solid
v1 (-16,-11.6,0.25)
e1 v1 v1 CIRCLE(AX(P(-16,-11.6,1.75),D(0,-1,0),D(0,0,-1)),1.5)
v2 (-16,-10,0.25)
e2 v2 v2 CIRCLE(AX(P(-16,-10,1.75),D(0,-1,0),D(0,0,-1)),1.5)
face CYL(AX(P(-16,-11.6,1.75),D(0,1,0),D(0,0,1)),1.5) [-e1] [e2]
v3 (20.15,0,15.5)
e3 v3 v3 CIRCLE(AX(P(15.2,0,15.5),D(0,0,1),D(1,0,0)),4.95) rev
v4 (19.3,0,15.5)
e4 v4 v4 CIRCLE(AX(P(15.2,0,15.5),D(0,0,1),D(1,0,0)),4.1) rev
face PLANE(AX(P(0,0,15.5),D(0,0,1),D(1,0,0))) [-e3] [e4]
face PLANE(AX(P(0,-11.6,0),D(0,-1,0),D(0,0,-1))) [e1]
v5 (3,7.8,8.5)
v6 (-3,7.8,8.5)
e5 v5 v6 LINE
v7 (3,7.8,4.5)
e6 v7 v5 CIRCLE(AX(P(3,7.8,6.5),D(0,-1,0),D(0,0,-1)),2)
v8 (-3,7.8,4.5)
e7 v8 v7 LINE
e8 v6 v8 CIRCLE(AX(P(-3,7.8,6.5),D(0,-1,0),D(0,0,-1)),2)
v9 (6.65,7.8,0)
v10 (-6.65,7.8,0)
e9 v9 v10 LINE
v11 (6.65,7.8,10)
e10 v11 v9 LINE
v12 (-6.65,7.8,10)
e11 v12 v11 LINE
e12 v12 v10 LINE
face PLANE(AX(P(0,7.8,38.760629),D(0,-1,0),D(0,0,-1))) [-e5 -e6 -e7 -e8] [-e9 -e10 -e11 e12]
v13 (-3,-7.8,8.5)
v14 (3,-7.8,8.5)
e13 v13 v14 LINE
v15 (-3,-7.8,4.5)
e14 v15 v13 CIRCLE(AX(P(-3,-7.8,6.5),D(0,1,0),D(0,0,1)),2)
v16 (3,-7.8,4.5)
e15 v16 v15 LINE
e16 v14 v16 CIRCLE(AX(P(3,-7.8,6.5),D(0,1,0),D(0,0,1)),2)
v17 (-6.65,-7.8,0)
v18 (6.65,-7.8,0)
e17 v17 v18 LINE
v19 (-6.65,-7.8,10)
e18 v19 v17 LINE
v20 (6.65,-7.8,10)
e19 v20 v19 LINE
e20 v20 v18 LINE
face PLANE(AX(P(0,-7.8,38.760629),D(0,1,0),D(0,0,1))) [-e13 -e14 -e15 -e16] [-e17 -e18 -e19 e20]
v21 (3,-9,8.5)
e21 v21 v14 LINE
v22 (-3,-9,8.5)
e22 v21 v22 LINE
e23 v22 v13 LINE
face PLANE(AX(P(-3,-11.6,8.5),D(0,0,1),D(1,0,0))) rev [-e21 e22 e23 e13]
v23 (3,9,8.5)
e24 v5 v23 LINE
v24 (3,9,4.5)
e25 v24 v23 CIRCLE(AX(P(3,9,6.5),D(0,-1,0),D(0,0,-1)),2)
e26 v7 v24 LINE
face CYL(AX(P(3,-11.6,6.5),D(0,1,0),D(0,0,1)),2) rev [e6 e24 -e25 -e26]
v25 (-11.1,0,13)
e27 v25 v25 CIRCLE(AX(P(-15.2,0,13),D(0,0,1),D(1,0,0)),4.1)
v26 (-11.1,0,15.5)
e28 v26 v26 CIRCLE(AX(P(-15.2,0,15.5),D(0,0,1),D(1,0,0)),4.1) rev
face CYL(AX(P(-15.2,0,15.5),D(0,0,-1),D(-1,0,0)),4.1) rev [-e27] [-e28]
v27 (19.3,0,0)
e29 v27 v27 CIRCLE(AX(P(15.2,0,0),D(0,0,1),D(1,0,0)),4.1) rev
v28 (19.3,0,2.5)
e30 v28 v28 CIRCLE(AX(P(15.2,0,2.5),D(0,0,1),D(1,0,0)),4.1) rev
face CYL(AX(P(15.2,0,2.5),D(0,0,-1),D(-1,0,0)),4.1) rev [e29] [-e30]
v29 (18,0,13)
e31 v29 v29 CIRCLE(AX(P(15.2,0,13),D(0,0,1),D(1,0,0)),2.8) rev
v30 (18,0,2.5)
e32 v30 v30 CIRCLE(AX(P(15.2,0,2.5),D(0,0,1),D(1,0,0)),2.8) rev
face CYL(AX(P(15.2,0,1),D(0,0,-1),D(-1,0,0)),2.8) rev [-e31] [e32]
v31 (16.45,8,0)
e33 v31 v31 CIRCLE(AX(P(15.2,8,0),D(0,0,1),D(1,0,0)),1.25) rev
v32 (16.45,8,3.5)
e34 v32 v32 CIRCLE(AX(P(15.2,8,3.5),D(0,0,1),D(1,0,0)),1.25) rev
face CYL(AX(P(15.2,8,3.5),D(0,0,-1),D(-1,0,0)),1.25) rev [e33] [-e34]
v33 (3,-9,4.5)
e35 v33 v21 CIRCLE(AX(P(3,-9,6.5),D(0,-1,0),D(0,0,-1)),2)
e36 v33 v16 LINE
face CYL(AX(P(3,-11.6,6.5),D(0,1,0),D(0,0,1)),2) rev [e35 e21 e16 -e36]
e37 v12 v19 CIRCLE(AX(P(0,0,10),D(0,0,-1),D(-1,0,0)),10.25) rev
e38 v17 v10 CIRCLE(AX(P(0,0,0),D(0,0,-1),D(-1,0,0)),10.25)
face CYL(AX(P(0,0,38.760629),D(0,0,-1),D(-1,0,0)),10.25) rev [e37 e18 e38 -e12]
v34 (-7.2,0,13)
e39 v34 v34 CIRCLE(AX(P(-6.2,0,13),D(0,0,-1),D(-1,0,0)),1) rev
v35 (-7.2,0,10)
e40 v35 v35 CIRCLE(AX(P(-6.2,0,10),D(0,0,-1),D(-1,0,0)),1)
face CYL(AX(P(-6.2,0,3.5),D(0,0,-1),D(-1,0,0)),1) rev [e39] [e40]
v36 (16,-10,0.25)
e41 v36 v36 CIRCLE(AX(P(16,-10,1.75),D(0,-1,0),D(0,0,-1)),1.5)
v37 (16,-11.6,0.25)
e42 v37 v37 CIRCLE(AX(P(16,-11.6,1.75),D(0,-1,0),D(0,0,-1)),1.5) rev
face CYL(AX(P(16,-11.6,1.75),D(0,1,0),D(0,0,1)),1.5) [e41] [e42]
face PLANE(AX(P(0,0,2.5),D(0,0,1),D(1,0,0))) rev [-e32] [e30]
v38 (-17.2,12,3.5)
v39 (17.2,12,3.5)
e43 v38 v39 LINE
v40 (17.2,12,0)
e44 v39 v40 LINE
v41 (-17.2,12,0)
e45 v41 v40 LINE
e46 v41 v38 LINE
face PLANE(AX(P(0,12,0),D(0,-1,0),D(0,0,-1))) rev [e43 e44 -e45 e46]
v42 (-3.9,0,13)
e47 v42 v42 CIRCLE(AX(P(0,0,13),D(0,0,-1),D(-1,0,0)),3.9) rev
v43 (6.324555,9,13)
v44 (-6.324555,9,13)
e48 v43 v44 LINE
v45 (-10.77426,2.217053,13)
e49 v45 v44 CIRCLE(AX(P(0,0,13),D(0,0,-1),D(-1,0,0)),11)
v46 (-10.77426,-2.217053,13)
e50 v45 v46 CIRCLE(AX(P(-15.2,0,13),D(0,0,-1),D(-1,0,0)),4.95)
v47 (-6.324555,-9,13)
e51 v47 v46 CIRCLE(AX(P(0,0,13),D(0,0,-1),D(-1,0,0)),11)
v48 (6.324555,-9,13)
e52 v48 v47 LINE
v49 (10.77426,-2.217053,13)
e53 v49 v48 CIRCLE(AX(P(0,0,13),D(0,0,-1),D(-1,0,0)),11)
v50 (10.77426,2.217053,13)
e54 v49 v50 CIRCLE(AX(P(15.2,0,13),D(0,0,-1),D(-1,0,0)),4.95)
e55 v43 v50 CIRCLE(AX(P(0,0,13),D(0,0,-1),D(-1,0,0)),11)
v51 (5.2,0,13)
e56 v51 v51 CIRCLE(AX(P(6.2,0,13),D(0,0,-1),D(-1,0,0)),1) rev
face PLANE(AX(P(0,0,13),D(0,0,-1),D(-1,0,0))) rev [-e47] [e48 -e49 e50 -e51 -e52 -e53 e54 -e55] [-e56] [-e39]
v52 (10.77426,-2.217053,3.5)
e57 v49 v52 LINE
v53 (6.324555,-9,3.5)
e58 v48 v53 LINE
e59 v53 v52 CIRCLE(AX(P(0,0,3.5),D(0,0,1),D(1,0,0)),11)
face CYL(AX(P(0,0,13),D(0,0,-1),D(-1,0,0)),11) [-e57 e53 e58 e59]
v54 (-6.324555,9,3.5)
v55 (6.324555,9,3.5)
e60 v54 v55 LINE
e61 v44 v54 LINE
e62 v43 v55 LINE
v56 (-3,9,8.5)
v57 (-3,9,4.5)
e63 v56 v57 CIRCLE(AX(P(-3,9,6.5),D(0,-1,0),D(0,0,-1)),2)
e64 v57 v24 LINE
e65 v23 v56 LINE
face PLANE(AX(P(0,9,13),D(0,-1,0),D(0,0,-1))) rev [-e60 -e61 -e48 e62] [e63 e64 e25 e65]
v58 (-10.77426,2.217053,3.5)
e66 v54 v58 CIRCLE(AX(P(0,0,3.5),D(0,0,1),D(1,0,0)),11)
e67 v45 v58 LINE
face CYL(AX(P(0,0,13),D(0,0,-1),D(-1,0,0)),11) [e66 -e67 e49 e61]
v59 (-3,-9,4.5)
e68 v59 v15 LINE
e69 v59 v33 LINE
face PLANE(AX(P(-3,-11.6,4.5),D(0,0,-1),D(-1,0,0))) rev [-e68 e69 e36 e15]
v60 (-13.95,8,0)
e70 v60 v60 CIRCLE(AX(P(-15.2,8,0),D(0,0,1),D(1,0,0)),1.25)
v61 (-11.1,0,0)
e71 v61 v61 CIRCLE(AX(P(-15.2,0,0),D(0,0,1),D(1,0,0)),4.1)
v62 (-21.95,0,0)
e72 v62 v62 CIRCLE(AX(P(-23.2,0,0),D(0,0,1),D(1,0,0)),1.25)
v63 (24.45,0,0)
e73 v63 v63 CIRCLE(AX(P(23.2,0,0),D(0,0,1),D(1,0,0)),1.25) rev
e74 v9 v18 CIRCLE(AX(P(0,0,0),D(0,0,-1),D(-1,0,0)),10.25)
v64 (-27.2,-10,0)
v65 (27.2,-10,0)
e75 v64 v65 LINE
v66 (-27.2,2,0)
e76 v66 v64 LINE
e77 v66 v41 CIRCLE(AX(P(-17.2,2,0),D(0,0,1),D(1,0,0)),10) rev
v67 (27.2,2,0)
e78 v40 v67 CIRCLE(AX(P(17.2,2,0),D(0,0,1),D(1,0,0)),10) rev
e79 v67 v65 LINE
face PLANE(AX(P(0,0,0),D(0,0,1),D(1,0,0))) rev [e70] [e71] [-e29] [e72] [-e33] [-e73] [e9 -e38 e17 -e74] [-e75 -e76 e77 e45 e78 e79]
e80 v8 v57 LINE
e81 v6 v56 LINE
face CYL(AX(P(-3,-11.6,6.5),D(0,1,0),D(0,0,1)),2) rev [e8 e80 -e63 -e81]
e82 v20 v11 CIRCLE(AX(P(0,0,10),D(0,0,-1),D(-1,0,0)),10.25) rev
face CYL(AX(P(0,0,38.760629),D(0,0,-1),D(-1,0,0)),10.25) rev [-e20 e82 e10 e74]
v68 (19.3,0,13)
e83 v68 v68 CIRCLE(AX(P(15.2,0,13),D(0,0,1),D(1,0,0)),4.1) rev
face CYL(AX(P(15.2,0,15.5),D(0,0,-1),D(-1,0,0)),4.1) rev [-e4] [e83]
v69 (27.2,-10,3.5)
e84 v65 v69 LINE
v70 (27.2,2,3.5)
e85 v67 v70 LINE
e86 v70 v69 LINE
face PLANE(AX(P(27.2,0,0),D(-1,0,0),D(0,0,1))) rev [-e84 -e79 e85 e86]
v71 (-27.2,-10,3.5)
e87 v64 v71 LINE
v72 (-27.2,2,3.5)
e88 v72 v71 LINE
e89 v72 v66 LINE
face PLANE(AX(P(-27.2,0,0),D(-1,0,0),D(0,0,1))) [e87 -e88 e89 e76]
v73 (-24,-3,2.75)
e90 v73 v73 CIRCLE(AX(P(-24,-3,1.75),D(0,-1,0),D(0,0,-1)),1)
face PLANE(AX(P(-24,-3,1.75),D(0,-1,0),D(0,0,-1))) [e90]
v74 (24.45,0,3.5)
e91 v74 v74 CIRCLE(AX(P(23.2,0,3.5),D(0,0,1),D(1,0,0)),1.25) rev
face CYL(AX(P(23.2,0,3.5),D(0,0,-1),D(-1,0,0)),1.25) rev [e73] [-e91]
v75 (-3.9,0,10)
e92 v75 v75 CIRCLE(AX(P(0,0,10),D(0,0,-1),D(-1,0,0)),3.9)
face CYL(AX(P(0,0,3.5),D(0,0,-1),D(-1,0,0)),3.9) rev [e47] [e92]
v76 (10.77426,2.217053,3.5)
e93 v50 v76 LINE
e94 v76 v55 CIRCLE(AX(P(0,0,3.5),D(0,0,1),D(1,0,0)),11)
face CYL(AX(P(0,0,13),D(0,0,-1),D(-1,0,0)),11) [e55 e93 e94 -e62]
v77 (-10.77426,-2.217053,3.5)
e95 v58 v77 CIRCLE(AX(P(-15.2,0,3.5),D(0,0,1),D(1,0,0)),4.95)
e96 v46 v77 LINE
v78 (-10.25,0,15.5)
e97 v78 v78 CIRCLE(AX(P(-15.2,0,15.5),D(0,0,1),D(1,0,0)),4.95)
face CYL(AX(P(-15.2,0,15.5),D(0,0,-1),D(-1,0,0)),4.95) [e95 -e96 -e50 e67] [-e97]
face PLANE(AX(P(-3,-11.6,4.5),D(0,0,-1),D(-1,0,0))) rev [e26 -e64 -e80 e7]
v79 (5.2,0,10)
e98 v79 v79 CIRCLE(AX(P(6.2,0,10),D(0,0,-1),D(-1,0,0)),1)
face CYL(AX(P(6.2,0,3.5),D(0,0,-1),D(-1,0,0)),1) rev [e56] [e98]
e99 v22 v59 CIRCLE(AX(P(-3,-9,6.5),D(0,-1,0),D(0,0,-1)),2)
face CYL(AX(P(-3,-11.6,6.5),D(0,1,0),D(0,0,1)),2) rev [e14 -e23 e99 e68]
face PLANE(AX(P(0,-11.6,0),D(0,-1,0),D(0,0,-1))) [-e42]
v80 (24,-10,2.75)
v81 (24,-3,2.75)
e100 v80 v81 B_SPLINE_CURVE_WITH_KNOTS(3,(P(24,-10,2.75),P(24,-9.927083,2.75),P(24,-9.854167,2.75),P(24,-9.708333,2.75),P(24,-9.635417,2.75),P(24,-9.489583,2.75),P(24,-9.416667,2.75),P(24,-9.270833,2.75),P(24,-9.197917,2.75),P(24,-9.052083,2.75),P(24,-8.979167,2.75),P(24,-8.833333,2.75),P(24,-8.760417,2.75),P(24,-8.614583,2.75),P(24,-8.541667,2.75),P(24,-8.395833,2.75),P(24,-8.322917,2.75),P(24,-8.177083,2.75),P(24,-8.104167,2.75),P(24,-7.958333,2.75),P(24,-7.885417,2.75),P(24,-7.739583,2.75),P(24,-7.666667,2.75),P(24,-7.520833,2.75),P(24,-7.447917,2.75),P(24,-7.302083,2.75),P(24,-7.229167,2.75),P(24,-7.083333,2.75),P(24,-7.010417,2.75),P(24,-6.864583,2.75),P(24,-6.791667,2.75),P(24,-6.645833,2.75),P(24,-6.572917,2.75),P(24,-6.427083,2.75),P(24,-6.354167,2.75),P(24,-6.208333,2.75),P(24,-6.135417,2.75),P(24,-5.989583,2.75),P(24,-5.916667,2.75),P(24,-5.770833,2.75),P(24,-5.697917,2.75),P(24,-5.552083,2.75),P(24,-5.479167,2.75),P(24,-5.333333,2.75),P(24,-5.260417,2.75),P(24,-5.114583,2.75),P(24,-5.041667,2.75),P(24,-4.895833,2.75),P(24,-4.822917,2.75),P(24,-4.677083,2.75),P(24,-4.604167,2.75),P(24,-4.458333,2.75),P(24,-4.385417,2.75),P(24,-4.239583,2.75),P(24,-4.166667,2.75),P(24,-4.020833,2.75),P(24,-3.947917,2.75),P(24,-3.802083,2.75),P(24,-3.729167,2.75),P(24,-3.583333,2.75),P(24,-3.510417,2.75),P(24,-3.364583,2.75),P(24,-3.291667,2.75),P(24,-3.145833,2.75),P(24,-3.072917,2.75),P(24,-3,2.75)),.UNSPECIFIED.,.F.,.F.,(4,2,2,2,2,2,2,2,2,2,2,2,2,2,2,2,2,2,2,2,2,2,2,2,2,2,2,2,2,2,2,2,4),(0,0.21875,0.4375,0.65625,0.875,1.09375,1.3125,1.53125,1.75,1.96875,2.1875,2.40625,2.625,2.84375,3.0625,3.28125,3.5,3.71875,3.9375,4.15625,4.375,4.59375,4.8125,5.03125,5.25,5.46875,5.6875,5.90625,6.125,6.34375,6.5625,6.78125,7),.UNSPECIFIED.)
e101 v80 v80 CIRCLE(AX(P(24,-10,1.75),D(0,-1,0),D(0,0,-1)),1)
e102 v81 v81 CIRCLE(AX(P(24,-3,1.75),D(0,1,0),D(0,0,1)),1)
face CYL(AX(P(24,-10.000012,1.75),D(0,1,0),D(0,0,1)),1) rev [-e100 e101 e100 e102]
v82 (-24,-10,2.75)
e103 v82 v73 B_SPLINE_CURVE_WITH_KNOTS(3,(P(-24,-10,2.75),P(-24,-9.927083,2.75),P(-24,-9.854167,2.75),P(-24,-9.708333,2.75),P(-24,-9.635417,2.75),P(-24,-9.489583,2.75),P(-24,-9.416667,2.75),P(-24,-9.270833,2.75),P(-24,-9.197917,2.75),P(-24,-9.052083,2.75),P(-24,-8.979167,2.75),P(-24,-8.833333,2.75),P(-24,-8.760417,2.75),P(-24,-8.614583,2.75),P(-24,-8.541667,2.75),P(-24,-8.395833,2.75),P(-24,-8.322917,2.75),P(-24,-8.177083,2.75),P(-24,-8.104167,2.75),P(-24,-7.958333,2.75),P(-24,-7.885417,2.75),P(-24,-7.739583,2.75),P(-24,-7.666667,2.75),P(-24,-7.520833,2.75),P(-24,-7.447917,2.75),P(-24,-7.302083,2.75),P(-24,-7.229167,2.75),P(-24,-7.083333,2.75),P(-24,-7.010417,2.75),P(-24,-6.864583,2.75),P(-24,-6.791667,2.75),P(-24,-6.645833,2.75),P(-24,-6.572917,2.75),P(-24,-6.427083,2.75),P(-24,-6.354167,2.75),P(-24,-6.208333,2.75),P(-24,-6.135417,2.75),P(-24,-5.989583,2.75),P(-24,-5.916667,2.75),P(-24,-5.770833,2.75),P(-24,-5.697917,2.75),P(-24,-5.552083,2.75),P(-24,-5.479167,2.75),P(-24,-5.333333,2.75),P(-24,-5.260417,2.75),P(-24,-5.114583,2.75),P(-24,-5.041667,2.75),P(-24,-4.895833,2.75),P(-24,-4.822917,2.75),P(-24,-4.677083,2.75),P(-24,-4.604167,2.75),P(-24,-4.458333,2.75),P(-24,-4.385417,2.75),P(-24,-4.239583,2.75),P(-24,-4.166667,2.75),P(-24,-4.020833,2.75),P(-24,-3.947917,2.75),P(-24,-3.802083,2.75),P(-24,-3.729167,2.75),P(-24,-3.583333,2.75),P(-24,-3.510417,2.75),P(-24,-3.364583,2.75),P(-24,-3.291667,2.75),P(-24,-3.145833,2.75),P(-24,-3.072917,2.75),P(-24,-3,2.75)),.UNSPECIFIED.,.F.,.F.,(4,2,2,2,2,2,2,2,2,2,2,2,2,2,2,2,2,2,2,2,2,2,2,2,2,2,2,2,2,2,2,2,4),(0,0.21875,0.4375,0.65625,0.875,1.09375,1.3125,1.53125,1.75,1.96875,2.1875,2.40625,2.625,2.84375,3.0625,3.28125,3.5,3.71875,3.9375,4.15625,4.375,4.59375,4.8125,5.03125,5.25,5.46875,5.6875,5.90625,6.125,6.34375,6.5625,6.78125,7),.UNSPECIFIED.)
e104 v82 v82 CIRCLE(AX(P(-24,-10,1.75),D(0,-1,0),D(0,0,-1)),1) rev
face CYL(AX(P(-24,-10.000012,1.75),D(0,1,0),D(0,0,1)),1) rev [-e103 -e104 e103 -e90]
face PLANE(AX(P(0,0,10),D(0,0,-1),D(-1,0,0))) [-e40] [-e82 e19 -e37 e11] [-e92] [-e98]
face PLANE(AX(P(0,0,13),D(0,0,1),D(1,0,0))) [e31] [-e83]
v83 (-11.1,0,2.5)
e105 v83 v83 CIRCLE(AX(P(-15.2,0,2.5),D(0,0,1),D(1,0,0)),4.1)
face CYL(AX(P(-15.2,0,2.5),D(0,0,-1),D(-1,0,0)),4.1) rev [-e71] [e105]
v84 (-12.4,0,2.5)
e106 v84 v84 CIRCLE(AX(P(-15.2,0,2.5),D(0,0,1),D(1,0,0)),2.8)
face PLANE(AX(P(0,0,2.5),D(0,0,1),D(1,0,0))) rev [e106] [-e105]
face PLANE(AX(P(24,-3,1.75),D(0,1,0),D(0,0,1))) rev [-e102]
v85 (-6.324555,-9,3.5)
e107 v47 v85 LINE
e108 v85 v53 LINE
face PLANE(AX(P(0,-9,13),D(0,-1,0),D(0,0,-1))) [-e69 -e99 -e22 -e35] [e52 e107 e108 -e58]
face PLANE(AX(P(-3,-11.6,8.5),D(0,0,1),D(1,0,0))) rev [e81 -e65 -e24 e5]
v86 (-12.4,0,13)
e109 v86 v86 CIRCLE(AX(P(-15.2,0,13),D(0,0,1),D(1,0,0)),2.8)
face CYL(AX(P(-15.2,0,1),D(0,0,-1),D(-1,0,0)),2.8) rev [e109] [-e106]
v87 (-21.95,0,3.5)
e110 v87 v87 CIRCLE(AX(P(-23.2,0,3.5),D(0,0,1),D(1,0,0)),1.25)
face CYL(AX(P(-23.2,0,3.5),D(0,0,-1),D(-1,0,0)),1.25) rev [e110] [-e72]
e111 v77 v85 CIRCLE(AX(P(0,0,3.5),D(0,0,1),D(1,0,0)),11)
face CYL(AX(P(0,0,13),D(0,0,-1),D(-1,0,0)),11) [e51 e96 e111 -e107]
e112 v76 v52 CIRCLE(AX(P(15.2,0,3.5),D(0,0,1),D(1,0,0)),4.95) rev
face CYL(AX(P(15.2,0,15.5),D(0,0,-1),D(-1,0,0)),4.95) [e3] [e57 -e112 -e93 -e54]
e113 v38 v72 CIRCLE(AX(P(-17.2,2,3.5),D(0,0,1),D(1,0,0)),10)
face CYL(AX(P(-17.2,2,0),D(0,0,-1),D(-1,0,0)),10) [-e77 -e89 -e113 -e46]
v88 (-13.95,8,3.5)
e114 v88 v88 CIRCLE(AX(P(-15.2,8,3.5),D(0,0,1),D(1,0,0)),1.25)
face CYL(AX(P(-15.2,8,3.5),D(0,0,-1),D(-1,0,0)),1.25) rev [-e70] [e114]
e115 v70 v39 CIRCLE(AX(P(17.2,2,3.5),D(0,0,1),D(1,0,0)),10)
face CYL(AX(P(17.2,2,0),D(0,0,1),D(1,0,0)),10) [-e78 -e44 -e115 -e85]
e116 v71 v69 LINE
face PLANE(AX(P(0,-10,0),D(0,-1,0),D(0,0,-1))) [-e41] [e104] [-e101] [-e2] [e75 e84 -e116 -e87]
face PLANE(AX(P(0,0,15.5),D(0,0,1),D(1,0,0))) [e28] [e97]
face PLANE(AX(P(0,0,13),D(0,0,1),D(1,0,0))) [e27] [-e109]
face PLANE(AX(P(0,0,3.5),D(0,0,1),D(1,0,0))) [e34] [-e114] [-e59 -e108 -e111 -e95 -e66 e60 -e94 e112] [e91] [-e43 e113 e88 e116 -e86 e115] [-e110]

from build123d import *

# Parameters (mm, degrees)
SKETCH_2_R               = 3.9
SKETCH_2_R_2             = 4.1
SKETCH_2_R_3             = 1
SKETCH_2_R_4             = 1.25
EXTRUDE_1_DEPTH          = 3.5
SKETCH_2_4_R             = 4.1
SKETCH_2_4_R_2           = 2.8
EXTRUDE_2_DEPTH          = 1
CUT_EXTRUDE_1_DEPTH      = 41.636067723
CUT_EXTRUDE_1_DEPTH_BACK = 41.636067723
SKETCH_3_W               = 54.4
SKETCH_3_H               = 22
FILLET_1_R               = 10
CUT_EXTRUDE_2_DEPTH      = 36.158071619
CUT_EXTRUDE_2_DEPTH_BACK = 7
SKETCH_4_R               = 1
SKETCH_4_4_R             = 1.5
EXTRUDE_3_DEPTH          = 1.6
SKETCH_5_R               = 1
SKETCH_5_R_2             = 3.9
EXTRUDE_4_DEPTH          = 13
SKETCH_6_R               = 1
SKETCH_6_R_2             = 3.9
CUT_EXTRUDE_3_DEPTH      = 10
CUT_EXTRUDE_4_DEPTH      = 37.51301138
CUT_EXTRUDE_4_DEPTH_BACK = 37.51301138
SKETCH_2_5_R             = 4.1
SKETCH_2_5_R_2           = 2.8
EXTRUDE_5_DEPTH          = 13
SKETCH_8_R               = 4.1
EXTRUDE_6_DEPTH          = 12
EXTRUDE_START            = 9.5
EXTRUDE_7_DEPTH          = 2.5
SKETCH_2_6_R             = 4.1
SKETCH_2_6_R_2           = 2.8
CUT_EXTRUDE_10_DEPTH     = 2.5


# Read off the part's stored shape, not the designer's step: 凸台-拉伸7
with BuildPart() as part:
    # 草图2 → 凸台-拉伸1 (new body)
    with BuildSketch(Plane.XY):
        with BuildLine():
            Line((15.2, -20), (-15.2, -20))
            ThreePointArc((-15.2, -20), (-35.2, 0), (-15.2, 20))
            Line((-15.2, 20), (15.2, 20))
            ThreePointArc((15.2, 20), (35.2, 0), (15.2, -20))
        make_face()
        Circle(SKETCH_2_R, mode=Mode.SUBTRACT)
        with Locations((-15.2, 0)):
            Circle(SKETCH_2_R_2, mode=Mode.SUBTRACT)
        with Locations((15.2, 0)):
            Circle(SKETCH_2_R_2, mode=Mode.SUBTRACT)
        with Locations((-6.2, 0)):
            Circle(SKETCH_2_R_3, mode=Mode.SUBTRACT)
        with Locations((6.2, 0)):
            Circle(SKETCH_2_R_3, mode=Mode.SUBTRACT)
        with Locations((-15.2, 8)):
            Circle(SKETCH_2_R_4, mode=Mode.SUBTRACT)
        with Locations((-23.2, 0)):
            Circle(SKETCH_2_R_4, mode=Mode.SUBTRACT)
        with Locations((23.2, 0)):
            Circle(SKETCH_2_R_4, mode=Mode.SUBTRACT)
        with Locations((15.2, 8)):
            Circle(SKETCH_2_R_4, mode=Mode.SUBTRACT)
    extrude(amount=EXTRUDE_1_DEPTH)

    # 草图2<4> → 凸台-拉伸2 (add)
    # profile 1 of 2: a face of its own
    with BuildSketch(Plane.XY):
        with Locations((-15.2, 0)):
            Circle(SKETCH_2_4_R)
        with Locations((-15.2, 0)):
            Circle(SKETCH_2_4_R_2, mode=Mode.SUBTRACT)
    # profile 2 of 2: a face of its own
    with BuildSketch(Plane.XY):
        with Locations((15.2, 0)):
            Circle(SKETCH_2_4_R)
        with Locations((15.2, 0)):
            Circle(SKETCH_2_4_R_2, mode=Mode.SUBTRACT)
    extrude(amount=EXTRUDE_2_DEPTH)

    # 草图3 → 切除-拉伸1 (cut, two sides: drawn at the far end of the back side and taken through both)
    with BuildSketch(Plane.XY.offset(3.5).offset(-CUT_EXTRUDE_1_DEPTH_BACK)):
        with BuildLine():
            Line((15.2, -20), (-15.2, -20))
            ThreePointArc((-15.2, -20), (-35.2, 0), (-15.2, 20))
            Line((-15.2, 20), (15.2, 20))
            ThreePointArc((15.2, 20), (35.2, 0), (15.2, -20))
        make_face()
        with Locations((0, 1)):
            Rectangle(SKETCH_3_W, SKETCH_3_H, mode=Mode.SUBTRACT)
    extrude(amount=CUT_EXTRUDE_1_DEPTH + CUT_EXTRUDE_1_DEPTH_BACK, mode=Mode.SUBTRACT)

    # 圆角1
    fillet_1_edges = [part.edges().sort_by_distance(p)[0] for p in [
        (27.2, 12, 1.75),
        (-27.2, 12, 1.75),
    ]]
    fillet(fillet_1_edges, radius=FILLET_1_R)

    # 草图4 → 切除-拉伸2 (cut, two sides: drawn at the far end of the back side and taken through both)
    with BuildSketch(Plane.XZ.offset(10).offset(-CUT_EXTRUDE_2_DEPTH_BACK)):
        with Locations(Location((-24, 1.75, 0), (0, 0, 90))):
            Circle(SKETCH_4_R)
        with Locations(Location((24, 1.75, 0), (0, 0, 90))):
            Circle(SKETCH_4_R)
    extrude(amount=CUT_EXTRUDE_2_DEPTH + CUT_EXTRUDE_2_DEPTH_BACK, mode=Mode.SUBTRACT)

    # 草图4<4> → 凸台-拉伸3 (add)
    with BuildSketch(Plane.XZ.offset(10)):
        with Locations(Location((-16, 1.75, 0), (0, 0, 270))):
            Circle(SKETCH_4_4_R)
        with Locations(Location((16, 1.75, 0), (0, 0, 270))):
            Circle(SKETCH_4_4_R)
    extrude(amount=EXTRUDE_3_DEPTH)

    # 草图5 → 凸台-拉伸4 (add)
    with BuildSketch(Plane(origin=(0, 0, 0), x_dir=(-1, 0, 0), z_dir=(0, 0, -1))):
        with BuildLine():
            Line((6.32455532, 9), (-6.32455532, 9))
            ThreePointArc((-6.32455532, 9), (-11, 0), (-6.32455532, -9))
            Line((-6.32455532, -9), (6.32455532, -9))
            ThreePointArc((6.32455532, -9), (9.761406367, -5.070990607), (11, 0))
            ThreePointArc((11, 0), (9.761406367, 5.070990607), (6.32455532, 9))
        make_face()
        with Locations((-6.2, 0)):
            Circle(SKETCH_5_R, mode=Mode.SUBTRACT)
        Circle(SKETCH_5_R_2, mode=Mode.SUBTRACT)
        with Locations((6.2, 0)):
            Circle(SKETCH_5_R, mode=Mode.SUBTRACT)
    extrude(amount=-EXTRUDE_4_DEPTH)

    # 草图6 → 切除-拉伸3 (cut)
    with BuildSketch(Plane(origin=(0, 0, 0), x_dir=(-1, 0, 0), z_dir=(0, 0, -1))):
        with BuildLine():
            Line((6.65, 7.8), (-6.65, 7.8))
            ThreePointArc((-6.65, 7.8), (-10.25, 0), (-6.65, -7.8))
            Line((-6.65, -7.8), (6.65, -7.8))
            ThreePointArc((6.65, -7.8), (9.306583691, -4.295346319), (10.25, 0))
            ThreePointArc((10.25, 0), (9.306583691, 4.295346319), (6.65, 7.8))
        make_face()
        with Locations((-6.2, 0)):
            Circle(SKETCH_6_R, mode=Mode.SUBTRACT)
        Circle(SKETCH_6_R_2, mode=Mode.SUBTRACT)
        with Locations((6.2, 0)):
            Circle(SKETCH_6_R, mode=Mode.SUBTRACT)
    extrude(amount=-CUT_EXTRUDE_3_DEPTH, mode=Mode.SUBTRACT)

    # 草图7 → 切除-拉伸4 (cut, two sides: drawn at the far end of the back side and taken through both)
    with BuildSketch(Plane(origin=(0, 9, 0), x_dir=(1, 0, 0), z_dir=(0, 1, 0)).offset(-CUT_EXTRUDE_4_DEPTH_BACK)):
        with BuildLine():
            Line((-3, -4.5), (3, -4.5))
            ThreePointArc((3, -4.5), (5, -6.5), (3, -8.5))
            Line((3, -8.5), (-3, -8.5))
            ThreePointArc((-3, -8.5), (-5, -6.5), (-3, -4.5))
        make_face()
    extrude(amount=CUT_EXTRUDE_4_DEPTH + CUT_EXTRUDE_4_DEPTH_BACK, mode=Mode.SUBTRACT)

    # 草图2<5> → 凸台-拉伸5 (add)
    # profile 1 of 2: a face of its own
    with BuildSketch(Plane.XY):
        with Locations(Location((-15.2, 0, 0), (0, 0, 180))):
            Circle(SKETCH_2_5_R)
        with Locations((-15.2, 0)):
            Circle(SKETCH_2_5_R_2, mode=Mode.SUBTRACT)
    # profile 2 of 2: a face of its own
    with BuildSketch(Plane.XY):
        with Locations(Location((15.2, 0, 0), (0, 0, 180))):
            Circle(SKETCH_2_5_R)
        with Locations((15.2, 0)):
            Circle(SKETCH_2_5_R_2, mode=Mode.SUBTRACT)
    extrude(amount=EXTRUDE_5_DEPTH)

    # 草图8 → 凸台-拉伸6 (add)
    # profile 1 of 2: a face of its own
    with BuildSketch(Plane.XY.offset(3.5)):
        with BuildLine():
            ThreePointArc((-10.774259868, -2.217053064), (-11, 0), (-10.774259868, 2.217053064))
            ThreePointArc((-10.774259868, 2.217053064), (-20.15, 0), (-10.774259868, -2.217053064))
        make_face()
        with Locations((-15.2, 0)):
            Circle(SKETCH_8_R, mode=Mode.SUBTRACT)
    # profile 2 of 2: a face of its own
    with BuildSketch(Plane.XY.offset(3.5)):
        with BuildLine():
            ThreePointArc((10.774259868, -2.217053064), (16.339097526, -4.817152356), (20.15, 0))
            ThreePointArc((20.15, 0), (16.339097526, 4.817152356), (10.774259868, 2.217053064))
            ThreePointArc((10.774259868, 2.217053064), (11, 0), (10.774259868, -2.217053064))
        make_face()
        with Locations((15.2, 0)):
            Circle(SKETCH_8_R, mode=Mode.SUBTRACT)
    extrude(amount=EXTRUDE_6_DEPTH)

    # 凸台-拉伸7 outline → 凸台-拉伸7 (add)
    with BuildSketch(Plane.XY.offset(3.5).offset(EXTRUDE_START)):
        with BuildLine():
            ThreePointArc((-10.774259868, -2.217053064), (-10.25, 0), (-10.774259868, 2.217053064))
            ThreePointArc((-10.774259868, 2.217053064), (-11, 0), (-10.774259868, -2.217053064))
        make_face()
        with BuildLine():
            ThreePointArc((10.774259868, -2.217053064), (11, 0), (10.774259868, 2.217053064))
            ThreePointArc((10.774259868, 2.217053064), (10.25, 0), (10.774259868, -2.217053064))
        make_face()
    extrude(amount=EXTRUDE_7_DEPTH)

    # 草图2<6> → 切除-拉伸10 (cut)
    # profile 1 of 2: a face of its own
    with BuildSketch(Plane.XY):
        with Locations((-15.2, 0)):
            Circle(SKETCH_2_6_R)
        with Locations((-15.2, 0)):
            Circle(SKETCH_2_6_R_2, mode=Mode.SUBTRACT)
    # profile 2 of 2: a face of its own
    with BuildSketch(Plane.XY):
        with Locations((15.2, 0)):
            Circle(SKETCH_2_6_R)
        with Locations((15.2, 0)):
            Circle(SKETCH_2_6_R_2, mode=Mode.SUBTRACT)
    extrude(amount=CUT_EXTRUDE_10_DEPTH, mode=Mode.SUBTRACT)


solid = part.part
